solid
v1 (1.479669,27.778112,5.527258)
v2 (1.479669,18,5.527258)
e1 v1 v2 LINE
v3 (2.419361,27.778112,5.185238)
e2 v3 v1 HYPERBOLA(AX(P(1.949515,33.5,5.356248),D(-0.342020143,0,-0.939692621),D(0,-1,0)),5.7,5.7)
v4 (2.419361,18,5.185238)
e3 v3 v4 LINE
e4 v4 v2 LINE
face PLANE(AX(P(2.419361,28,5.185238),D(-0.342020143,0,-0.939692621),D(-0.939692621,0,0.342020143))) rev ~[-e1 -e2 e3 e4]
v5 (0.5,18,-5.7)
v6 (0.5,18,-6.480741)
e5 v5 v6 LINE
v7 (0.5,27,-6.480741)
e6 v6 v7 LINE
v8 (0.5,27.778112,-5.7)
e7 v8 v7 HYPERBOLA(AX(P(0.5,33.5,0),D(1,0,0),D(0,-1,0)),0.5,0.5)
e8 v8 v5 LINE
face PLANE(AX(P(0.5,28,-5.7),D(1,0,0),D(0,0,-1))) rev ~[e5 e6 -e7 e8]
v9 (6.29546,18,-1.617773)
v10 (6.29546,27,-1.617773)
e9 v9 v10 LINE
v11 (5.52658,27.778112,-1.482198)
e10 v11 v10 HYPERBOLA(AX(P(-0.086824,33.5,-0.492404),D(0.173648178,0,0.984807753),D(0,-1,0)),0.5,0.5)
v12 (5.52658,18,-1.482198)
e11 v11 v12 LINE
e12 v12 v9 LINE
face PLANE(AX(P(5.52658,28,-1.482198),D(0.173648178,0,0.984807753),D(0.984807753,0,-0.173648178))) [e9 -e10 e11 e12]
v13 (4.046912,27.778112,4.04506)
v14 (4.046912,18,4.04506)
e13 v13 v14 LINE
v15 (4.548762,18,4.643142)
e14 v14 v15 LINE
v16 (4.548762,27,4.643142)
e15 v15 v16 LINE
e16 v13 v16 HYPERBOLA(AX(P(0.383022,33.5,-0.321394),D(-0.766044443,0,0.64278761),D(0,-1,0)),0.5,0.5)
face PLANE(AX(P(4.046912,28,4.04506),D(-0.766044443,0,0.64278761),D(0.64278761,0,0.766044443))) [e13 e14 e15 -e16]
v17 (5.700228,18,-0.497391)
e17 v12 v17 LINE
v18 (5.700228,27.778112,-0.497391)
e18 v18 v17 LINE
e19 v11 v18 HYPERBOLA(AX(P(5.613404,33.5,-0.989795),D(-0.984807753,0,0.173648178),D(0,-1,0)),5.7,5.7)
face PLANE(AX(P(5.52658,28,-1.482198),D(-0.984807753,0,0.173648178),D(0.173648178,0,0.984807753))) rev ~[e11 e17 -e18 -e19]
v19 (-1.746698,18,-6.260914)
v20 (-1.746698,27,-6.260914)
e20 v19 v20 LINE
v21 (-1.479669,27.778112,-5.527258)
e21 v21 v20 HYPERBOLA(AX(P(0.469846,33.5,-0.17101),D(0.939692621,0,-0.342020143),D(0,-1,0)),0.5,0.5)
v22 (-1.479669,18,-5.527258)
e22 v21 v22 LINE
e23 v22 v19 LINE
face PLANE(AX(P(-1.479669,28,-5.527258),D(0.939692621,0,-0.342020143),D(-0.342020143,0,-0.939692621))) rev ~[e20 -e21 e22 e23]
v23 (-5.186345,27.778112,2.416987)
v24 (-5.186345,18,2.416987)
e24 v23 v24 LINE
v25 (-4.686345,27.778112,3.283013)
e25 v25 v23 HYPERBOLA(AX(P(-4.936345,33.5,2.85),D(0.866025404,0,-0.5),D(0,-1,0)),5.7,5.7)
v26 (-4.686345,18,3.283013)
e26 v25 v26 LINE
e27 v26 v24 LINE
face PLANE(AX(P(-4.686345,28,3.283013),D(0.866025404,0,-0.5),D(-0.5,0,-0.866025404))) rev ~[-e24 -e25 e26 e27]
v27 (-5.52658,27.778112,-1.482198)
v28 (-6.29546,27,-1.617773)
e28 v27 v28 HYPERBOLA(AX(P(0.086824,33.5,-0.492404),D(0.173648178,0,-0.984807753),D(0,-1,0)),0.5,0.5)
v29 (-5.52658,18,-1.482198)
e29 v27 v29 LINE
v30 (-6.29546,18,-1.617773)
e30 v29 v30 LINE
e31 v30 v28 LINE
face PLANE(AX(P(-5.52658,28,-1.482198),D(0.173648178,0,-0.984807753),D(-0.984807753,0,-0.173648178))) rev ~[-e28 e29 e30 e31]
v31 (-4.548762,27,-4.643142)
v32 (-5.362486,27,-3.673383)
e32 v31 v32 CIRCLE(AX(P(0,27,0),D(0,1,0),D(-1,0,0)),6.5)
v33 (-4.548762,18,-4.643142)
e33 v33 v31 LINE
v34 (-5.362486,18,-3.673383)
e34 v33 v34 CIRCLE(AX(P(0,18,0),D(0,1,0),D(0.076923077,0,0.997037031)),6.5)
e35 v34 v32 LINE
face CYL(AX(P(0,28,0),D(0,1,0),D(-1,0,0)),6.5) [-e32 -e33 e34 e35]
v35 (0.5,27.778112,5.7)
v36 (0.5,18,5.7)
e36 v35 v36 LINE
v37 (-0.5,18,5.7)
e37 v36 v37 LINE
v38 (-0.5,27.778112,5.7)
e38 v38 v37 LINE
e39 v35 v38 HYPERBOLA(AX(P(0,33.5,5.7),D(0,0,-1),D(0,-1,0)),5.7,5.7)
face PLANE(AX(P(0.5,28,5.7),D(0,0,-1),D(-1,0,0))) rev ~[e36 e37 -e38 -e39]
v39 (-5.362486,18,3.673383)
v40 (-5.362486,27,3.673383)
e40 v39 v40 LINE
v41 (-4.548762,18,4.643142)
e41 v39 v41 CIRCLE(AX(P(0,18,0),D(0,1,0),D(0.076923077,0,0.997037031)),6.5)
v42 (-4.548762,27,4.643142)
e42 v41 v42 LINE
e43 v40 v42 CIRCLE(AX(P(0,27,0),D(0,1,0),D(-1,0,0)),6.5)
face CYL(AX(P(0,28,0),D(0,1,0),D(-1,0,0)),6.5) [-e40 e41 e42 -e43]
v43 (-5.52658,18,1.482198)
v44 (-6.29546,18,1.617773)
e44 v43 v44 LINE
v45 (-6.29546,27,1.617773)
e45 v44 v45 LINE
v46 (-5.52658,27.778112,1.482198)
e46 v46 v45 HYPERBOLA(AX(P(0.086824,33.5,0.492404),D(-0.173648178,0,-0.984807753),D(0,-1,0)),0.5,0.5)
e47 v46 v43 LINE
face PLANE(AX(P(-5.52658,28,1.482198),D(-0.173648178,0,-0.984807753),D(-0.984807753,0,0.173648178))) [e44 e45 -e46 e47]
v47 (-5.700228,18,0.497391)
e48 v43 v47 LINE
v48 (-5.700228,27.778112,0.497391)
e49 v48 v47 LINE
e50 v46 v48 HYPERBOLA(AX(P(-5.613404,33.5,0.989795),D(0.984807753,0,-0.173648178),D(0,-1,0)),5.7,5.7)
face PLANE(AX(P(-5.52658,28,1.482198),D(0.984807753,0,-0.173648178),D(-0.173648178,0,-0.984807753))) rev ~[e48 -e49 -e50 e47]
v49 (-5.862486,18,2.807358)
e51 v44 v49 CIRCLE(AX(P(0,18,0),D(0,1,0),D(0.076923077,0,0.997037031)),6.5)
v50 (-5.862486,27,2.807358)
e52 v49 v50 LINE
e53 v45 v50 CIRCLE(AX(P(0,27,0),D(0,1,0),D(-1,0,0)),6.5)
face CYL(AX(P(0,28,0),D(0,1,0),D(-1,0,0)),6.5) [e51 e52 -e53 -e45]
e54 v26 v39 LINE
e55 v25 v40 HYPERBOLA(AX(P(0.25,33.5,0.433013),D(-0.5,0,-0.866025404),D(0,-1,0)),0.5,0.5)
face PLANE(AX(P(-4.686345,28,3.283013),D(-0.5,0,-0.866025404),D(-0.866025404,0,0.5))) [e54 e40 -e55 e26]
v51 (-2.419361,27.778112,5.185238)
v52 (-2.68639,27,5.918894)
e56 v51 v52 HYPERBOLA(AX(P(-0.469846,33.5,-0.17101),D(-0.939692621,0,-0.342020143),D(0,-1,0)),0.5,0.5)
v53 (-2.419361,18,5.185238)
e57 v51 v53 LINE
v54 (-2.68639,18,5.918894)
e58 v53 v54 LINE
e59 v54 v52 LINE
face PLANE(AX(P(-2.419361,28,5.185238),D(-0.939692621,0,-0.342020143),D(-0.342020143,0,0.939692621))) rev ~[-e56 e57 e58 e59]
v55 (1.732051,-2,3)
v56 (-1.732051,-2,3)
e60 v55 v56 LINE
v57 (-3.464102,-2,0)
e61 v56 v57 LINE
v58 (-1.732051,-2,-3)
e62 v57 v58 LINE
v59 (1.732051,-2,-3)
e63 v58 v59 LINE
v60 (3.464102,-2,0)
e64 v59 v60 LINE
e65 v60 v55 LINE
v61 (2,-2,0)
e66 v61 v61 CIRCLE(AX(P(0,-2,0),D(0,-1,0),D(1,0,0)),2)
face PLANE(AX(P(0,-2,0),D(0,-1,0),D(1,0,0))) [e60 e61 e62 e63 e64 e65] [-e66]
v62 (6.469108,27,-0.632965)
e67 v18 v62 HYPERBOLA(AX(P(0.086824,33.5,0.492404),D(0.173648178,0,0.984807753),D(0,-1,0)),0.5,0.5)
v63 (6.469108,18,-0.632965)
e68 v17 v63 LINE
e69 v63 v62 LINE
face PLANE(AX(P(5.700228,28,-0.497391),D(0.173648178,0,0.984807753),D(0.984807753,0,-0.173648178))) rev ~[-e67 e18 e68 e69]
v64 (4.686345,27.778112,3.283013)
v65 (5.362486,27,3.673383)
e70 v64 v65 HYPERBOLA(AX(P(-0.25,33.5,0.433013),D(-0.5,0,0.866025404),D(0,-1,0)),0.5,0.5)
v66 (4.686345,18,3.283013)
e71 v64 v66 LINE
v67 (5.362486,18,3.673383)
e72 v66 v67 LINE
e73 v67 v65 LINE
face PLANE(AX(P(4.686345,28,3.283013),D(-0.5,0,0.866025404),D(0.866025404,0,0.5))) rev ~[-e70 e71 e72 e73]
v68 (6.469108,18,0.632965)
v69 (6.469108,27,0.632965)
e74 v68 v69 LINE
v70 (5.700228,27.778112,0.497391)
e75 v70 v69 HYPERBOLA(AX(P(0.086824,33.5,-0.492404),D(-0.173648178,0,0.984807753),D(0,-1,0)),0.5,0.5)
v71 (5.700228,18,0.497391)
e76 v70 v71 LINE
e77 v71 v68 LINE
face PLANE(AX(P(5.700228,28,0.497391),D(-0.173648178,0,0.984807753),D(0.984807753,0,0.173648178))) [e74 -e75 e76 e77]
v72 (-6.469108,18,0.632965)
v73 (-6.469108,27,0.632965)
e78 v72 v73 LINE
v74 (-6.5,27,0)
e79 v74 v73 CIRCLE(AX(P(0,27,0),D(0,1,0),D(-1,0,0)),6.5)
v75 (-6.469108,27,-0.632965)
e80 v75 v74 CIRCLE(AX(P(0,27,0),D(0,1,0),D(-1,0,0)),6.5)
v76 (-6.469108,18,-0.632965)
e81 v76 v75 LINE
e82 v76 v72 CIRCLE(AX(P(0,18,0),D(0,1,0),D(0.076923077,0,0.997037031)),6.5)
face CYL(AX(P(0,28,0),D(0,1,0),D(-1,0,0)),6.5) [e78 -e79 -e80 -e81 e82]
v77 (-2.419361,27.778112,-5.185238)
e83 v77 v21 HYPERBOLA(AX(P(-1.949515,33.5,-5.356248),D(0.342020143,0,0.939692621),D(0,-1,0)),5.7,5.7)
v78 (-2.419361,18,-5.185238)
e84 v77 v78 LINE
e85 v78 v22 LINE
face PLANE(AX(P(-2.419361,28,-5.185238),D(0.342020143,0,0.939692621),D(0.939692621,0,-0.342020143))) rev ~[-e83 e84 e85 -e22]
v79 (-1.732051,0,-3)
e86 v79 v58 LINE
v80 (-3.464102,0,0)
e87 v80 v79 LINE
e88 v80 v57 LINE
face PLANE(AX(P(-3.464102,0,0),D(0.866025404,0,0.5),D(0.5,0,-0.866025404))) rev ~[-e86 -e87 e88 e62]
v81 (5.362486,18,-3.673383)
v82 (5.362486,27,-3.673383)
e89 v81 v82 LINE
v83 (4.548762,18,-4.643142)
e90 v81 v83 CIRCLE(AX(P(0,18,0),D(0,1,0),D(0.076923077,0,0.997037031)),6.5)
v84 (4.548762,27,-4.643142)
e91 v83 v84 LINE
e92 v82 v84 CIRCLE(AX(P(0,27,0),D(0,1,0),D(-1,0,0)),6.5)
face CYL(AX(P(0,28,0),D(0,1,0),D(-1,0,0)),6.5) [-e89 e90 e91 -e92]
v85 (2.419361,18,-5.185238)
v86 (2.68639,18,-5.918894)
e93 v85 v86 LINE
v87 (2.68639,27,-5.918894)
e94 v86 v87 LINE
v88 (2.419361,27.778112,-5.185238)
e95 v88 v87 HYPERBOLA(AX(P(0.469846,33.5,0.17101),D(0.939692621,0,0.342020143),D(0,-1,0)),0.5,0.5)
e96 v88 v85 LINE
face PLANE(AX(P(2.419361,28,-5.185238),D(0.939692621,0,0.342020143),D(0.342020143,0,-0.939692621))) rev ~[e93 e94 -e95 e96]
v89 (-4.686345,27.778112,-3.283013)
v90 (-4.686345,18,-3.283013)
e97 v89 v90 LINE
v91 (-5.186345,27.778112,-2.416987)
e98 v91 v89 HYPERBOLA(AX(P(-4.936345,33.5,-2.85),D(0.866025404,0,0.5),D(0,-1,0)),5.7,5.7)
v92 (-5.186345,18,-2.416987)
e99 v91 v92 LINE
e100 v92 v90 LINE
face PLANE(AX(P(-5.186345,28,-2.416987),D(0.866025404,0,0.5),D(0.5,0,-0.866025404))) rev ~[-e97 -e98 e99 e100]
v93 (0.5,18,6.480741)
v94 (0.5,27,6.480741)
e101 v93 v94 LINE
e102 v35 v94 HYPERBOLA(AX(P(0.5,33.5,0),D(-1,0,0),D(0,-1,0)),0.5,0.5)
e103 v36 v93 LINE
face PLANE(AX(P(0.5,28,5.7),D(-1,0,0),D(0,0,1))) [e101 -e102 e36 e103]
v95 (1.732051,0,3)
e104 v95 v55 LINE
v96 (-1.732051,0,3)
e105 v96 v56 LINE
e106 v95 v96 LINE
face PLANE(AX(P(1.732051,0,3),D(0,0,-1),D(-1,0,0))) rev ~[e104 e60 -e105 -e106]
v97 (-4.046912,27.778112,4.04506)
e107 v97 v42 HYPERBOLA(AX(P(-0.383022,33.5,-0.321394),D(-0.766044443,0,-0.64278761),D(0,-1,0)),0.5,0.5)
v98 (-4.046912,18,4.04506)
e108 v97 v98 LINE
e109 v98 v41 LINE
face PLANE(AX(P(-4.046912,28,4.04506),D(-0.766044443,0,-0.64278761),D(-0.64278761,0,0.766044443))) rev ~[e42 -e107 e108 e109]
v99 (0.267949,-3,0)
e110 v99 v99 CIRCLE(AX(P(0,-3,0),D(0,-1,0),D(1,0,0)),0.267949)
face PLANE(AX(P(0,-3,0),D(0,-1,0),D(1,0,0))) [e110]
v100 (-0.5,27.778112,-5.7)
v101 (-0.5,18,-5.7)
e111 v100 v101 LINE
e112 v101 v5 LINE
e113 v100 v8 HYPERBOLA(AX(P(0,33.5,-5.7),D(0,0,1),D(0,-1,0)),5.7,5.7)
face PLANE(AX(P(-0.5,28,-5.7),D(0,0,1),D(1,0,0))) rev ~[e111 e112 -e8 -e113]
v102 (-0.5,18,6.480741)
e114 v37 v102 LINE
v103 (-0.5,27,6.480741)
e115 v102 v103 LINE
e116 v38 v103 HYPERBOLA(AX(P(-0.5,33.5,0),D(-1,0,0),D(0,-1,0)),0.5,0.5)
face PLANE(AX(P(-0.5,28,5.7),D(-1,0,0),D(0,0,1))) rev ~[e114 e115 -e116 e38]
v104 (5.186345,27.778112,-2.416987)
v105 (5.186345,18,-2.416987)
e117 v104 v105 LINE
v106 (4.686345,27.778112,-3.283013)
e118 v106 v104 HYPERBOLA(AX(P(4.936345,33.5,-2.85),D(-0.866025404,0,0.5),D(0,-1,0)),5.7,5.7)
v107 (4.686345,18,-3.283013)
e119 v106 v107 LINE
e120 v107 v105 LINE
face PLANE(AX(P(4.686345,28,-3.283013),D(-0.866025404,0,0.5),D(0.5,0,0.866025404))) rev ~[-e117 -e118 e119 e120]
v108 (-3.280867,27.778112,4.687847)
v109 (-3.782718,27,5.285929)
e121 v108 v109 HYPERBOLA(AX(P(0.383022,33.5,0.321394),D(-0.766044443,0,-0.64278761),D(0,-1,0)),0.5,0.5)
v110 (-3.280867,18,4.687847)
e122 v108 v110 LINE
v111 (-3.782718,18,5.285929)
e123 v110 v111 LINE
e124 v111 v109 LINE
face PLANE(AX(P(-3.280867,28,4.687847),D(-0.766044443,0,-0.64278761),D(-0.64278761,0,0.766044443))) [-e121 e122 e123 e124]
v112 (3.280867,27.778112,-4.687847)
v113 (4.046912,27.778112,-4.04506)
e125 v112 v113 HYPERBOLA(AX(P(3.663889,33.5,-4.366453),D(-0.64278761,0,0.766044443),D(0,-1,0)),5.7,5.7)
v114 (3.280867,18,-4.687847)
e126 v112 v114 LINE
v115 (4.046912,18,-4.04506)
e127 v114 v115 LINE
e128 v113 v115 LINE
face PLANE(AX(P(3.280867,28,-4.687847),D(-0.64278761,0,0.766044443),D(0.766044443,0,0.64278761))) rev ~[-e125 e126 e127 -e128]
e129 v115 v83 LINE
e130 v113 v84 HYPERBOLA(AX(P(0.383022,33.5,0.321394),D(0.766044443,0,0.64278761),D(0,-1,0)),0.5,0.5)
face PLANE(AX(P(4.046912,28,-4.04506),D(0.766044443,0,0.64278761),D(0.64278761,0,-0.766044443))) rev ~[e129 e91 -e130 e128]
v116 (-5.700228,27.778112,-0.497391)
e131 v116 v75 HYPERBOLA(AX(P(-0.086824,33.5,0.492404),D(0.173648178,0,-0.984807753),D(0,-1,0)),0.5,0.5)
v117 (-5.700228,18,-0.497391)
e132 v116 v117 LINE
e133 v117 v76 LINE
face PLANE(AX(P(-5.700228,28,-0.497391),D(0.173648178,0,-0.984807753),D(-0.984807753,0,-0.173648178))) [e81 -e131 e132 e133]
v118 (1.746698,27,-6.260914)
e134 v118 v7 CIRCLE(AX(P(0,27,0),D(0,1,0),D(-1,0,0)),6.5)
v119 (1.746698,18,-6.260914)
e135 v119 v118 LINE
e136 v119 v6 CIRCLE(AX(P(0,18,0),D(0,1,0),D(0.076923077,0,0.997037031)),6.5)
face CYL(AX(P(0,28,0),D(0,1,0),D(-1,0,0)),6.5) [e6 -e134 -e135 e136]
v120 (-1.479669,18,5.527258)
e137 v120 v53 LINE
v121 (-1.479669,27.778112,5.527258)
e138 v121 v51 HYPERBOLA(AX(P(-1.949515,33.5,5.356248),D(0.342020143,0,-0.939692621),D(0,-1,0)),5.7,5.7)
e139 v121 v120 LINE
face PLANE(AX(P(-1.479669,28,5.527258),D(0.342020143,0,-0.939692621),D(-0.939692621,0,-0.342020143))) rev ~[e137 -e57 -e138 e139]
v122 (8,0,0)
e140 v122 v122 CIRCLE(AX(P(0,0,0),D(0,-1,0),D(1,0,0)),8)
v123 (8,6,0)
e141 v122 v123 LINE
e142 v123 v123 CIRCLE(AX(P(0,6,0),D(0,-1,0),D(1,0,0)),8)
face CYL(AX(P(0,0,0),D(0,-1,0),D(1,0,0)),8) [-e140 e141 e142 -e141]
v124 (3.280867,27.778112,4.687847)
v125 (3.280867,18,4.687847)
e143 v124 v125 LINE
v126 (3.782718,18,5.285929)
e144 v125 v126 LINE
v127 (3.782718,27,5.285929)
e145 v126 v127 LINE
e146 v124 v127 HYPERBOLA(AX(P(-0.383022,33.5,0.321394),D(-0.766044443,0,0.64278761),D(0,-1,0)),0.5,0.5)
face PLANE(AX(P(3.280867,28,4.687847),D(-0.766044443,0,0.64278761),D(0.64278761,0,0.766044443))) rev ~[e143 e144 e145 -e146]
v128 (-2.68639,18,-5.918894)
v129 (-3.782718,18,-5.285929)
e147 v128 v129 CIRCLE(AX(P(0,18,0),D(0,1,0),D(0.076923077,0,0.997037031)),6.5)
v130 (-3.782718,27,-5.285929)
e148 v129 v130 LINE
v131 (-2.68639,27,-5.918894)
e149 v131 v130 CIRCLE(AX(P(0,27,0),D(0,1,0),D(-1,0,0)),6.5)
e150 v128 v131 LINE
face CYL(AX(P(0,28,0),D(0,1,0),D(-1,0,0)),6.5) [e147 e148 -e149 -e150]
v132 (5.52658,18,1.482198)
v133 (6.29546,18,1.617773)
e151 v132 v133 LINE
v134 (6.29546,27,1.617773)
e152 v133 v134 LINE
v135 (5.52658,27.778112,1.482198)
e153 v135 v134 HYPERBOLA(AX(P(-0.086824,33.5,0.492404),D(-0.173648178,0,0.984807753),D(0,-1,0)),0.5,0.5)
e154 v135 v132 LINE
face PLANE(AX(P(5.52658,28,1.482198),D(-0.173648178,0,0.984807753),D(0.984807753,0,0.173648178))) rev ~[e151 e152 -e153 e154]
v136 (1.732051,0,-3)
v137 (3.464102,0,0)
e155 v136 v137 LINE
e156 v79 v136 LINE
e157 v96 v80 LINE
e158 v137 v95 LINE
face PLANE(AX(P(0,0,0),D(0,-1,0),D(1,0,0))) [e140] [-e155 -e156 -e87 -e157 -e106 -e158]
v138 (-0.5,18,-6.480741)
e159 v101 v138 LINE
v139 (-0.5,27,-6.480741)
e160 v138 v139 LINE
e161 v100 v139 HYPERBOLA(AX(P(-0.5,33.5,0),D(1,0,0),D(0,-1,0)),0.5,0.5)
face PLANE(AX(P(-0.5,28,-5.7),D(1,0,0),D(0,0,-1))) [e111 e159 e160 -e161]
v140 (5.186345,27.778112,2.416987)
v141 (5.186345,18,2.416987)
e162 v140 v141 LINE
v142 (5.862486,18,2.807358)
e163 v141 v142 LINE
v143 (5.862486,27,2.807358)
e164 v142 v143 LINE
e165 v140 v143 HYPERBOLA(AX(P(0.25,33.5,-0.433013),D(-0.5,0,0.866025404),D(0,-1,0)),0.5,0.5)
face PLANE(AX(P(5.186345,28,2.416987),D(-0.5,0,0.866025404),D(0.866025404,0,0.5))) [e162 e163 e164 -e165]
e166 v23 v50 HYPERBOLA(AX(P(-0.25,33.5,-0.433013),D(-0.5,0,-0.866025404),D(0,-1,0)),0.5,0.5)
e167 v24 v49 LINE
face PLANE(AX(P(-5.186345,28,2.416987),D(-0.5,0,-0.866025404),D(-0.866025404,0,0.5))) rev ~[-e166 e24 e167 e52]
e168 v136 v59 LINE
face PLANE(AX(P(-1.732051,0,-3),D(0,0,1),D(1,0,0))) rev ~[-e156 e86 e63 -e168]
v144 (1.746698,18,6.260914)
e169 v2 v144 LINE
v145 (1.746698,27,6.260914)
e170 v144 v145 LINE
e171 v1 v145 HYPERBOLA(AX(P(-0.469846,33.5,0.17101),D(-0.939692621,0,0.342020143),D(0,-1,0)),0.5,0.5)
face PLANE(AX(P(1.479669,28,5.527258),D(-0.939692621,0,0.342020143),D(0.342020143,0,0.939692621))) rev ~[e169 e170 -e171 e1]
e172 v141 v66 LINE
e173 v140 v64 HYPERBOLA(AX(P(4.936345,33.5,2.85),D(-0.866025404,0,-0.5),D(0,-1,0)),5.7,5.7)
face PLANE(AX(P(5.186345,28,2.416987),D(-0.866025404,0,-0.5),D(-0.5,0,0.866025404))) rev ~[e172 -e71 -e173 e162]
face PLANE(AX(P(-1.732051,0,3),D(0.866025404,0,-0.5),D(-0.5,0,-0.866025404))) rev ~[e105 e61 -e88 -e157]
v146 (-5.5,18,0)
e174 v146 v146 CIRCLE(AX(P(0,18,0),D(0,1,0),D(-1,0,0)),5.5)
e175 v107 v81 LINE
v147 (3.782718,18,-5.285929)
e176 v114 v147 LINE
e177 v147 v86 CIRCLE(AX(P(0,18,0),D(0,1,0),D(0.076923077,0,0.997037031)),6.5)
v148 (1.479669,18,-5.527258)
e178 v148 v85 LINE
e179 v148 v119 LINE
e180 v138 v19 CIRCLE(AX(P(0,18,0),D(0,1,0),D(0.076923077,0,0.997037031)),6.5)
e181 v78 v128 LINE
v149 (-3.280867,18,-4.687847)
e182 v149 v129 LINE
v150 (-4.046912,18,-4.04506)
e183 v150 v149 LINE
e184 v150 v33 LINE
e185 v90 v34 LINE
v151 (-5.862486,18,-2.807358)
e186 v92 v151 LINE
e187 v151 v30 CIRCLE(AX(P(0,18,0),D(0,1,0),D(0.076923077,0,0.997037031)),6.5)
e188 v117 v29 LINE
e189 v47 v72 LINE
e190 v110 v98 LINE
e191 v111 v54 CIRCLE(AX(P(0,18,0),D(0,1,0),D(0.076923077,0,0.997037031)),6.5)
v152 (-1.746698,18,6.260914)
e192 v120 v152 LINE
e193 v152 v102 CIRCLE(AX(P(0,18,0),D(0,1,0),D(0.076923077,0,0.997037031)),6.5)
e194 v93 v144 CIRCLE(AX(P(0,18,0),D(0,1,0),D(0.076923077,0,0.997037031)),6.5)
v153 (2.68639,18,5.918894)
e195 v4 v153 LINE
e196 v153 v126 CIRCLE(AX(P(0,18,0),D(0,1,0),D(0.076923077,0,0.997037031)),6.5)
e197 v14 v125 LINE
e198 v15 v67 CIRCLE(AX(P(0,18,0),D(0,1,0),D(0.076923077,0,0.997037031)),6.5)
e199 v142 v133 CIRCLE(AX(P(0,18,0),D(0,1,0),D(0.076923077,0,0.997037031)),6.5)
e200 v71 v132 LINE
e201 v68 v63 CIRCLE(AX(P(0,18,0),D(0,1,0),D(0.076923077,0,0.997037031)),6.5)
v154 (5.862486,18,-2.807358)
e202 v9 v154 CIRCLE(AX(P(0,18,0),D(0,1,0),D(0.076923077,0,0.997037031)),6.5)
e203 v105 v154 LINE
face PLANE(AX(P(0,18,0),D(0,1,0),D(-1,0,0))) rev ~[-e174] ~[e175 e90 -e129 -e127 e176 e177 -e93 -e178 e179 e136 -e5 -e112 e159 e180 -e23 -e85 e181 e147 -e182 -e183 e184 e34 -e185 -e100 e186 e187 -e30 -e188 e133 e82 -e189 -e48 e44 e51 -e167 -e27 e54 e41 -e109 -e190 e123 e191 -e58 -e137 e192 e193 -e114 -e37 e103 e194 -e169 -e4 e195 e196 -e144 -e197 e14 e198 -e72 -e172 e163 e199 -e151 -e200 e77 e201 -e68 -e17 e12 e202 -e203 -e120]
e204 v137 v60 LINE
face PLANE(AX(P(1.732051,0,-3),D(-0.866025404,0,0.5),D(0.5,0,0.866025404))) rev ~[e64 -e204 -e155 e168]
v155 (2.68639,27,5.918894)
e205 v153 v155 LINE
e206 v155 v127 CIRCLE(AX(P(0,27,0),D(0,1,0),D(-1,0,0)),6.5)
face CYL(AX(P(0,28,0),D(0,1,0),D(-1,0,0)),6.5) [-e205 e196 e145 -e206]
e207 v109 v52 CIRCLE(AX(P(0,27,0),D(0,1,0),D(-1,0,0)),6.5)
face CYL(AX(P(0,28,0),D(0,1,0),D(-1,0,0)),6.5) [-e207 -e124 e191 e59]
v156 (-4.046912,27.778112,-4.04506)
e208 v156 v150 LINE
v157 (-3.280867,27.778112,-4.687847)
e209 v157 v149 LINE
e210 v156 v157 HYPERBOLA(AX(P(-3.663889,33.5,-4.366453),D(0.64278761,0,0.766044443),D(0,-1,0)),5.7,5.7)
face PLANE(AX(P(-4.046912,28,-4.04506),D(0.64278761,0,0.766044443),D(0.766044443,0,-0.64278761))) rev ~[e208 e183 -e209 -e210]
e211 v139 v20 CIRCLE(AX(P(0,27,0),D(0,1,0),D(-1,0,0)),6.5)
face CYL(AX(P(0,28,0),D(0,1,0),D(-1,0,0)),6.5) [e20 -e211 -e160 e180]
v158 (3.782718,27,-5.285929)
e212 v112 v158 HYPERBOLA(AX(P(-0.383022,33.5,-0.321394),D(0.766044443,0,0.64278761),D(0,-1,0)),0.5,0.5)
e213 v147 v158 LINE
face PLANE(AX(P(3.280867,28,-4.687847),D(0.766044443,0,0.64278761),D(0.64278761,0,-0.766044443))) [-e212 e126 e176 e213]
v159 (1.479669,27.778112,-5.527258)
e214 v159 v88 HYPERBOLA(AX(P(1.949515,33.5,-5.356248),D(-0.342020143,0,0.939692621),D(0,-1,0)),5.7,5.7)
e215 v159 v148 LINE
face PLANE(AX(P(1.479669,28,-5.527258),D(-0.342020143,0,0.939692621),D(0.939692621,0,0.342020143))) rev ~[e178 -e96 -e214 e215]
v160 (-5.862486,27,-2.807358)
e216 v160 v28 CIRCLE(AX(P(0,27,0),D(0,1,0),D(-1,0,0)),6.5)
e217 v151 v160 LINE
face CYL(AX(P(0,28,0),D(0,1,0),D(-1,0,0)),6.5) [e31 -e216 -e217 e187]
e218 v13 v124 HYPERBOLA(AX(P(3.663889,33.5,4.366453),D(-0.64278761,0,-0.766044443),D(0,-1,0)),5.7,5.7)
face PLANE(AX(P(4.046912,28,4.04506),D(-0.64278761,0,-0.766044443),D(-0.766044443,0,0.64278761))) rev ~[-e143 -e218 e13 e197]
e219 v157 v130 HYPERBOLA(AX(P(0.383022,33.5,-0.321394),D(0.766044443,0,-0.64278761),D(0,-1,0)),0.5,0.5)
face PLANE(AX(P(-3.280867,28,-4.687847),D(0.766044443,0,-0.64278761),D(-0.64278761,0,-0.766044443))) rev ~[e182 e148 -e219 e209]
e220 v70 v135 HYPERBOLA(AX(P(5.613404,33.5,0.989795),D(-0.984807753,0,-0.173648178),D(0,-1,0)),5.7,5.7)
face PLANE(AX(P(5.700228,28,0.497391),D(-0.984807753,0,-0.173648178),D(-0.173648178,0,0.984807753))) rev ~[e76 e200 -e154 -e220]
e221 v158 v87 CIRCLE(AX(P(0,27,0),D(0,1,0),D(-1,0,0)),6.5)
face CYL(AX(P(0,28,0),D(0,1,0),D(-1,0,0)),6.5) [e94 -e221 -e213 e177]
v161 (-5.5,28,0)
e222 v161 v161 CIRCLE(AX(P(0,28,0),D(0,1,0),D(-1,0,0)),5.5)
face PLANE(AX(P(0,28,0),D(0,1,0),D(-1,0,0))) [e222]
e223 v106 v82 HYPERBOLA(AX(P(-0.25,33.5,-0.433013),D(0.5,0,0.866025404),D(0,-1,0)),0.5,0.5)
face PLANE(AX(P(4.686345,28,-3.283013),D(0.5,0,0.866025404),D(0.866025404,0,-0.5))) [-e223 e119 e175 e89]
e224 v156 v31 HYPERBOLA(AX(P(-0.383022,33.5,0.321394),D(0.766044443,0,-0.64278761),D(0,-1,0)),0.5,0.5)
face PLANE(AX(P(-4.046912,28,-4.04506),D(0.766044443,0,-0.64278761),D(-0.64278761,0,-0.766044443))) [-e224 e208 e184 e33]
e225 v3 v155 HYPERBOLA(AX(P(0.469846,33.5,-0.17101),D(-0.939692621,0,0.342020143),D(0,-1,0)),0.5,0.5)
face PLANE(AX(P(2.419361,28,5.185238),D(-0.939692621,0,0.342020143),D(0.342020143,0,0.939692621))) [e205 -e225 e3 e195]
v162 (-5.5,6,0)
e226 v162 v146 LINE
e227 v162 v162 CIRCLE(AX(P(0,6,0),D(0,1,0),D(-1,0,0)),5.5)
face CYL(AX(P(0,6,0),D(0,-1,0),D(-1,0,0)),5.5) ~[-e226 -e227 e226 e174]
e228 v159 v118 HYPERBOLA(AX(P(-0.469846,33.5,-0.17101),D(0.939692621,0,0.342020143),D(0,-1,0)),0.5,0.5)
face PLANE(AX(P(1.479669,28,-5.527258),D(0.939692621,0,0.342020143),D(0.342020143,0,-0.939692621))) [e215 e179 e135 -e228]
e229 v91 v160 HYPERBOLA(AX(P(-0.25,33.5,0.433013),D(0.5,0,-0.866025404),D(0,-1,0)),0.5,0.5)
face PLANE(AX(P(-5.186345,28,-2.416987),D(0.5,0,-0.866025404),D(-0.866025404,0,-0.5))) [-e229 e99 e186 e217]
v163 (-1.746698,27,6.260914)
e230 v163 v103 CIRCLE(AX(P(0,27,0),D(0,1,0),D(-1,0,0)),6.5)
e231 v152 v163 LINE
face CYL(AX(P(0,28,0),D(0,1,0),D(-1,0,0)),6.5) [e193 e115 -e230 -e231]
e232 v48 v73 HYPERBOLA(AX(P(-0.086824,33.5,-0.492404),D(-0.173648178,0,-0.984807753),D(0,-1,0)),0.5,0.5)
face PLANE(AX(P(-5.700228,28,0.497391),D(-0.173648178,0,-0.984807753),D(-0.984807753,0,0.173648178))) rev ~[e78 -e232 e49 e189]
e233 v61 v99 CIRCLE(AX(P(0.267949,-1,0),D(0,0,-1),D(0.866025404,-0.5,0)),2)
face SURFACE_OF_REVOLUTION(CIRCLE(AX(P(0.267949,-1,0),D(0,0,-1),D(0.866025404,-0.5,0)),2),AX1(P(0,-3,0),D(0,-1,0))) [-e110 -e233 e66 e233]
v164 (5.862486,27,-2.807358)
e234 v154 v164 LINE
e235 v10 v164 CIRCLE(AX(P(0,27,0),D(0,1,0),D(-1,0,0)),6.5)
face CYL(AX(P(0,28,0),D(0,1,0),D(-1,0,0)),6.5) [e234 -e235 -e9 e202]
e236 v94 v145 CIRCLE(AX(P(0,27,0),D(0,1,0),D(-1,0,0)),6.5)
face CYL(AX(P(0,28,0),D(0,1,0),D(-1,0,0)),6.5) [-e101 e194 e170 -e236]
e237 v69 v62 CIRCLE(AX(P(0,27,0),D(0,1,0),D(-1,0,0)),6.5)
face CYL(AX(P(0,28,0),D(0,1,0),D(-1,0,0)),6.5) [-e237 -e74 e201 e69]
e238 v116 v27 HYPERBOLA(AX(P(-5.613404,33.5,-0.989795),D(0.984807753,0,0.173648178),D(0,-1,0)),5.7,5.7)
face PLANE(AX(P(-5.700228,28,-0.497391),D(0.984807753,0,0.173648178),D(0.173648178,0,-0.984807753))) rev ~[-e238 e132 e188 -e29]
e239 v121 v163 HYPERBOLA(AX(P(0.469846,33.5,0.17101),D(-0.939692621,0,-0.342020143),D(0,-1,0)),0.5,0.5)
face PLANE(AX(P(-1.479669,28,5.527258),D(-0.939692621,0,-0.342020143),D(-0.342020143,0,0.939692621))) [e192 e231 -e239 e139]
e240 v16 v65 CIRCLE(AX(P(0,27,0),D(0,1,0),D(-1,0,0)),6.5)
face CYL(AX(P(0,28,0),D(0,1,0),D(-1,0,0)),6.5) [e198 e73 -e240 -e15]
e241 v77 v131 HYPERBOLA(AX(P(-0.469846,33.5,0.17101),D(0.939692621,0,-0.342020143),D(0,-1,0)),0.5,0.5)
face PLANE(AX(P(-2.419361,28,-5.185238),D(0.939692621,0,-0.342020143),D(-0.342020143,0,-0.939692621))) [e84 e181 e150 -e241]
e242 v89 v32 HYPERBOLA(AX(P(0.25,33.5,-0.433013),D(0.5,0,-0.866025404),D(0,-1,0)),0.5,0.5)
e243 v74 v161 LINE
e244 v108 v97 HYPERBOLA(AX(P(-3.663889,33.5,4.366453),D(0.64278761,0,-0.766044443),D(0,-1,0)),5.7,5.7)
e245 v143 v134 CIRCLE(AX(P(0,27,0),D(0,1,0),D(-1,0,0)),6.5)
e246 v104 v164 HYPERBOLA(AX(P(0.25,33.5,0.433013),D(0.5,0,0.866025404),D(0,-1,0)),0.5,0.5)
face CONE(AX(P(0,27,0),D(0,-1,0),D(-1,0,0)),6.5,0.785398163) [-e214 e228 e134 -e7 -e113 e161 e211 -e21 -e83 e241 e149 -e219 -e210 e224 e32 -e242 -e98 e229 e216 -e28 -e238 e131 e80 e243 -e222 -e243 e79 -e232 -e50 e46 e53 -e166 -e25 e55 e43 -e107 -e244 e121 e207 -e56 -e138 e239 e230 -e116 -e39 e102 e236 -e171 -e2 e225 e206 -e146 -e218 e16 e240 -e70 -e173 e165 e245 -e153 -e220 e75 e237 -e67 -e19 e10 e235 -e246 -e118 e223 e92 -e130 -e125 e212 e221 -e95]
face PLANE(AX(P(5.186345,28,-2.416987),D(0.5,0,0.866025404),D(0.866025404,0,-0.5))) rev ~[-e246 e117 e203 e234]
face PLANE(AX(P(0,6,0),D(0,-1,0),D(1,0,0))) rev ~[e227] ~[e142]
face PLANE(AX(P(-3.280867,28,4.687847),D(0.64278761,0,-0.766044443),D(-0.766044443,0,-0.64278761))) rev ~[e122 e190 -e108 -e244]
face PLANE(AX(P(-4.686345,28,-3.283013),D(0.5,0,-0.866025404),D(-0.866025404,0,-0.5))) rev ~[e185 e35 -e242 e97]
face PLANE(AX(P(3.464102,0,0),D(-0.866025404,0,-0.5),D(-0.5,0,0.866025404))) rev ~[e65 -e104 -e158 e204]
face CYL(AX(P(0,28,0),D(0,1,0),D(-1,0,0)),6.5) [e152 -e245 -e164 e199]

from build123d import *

# Parameters (mm, degrees)
F0_R             = 8
F1_DEPTH         = 6
F3_DEPTH         = 2
F4_R             = 2
F5_DEPTH         = 1
F7_R             = 5.5
F8_DEPTH         = 22
F9_R             = 6.5
F9_R_2           = 5.5
F10_DEPTH        = 10
F11_SIZE         = 1
F12_W            = 1
F12_H            = 2
F13_DEPTH        = 20
F13_COPIES_COUNT = 18


# Not quite as in the source:
# - a fillet or chamfer that OpenCascade refuses, or shapes differently, is made with other operations: its cross-section is extruded or revolved along the edge and cut away or added
# - a pattern or mirror of a feature is missing from the dataset's text; its kind, count and spacing are read off the source's solid


with BuildPart() as f1:
    # F0 (on Front) → F1 (new body)
    with BuildSketch(Plane.XZ):
        Circle(F0_R)
    extrude(amount=-F1_DEPTH)

    # F2 (on face) → F3 (join)
    with BuildSketch(Plane.XZ):
        Polygon((-1.7320508076, 3), (-3.4641016151, 0), (-1.7320508076, -3), (1.7320508076, -3), (3.4641016151, 0), (1.7320508076, 3), align=None)
    extrude(amount=F3_DEPTH)

    # F4 (on face) → F5 (join)
    with BuildSketch(Plane.XZ.offset(2)):
        Circle(F4_R)
    extrude(amount=F5_DEPTH)

    # F6: fillet of radius 2 on 1 edges, made by hand

    # F6_s1 → F6_t2 (revolve, cut)
    with BuildSketch(Plane.XY):
        with BuildLine():
            ThreePointArc((2, -2), (1.2679491924, -2.7320508076), (0.2679491924, -3))
            Line((0.2679491924, -3), (2, -3))
            Line((2, -3), (2, -2))
        make_face()
    revolve(axis=Axis((0, -3, 0), (0, -1, 0)), mode=Mode.SUBTRACT)

    # F7 (on face) → F8 (join)
    with BuildSketch(Plane(origin=(0, 6, 0), x_dir=(-1, 0, 0), z_dir=(0, 1, 0))):
        Circle(F7_R)
    extrude(amount=F8_DEPTH)

    # F9 (on face) → F10 (join)
    with BuildSketch(Plane(origin=(0, 28, 0), x_dir=(-1, 0, 0), z_dir=(0, 1, 0))):
        Circle(F9_R)
        Circle(F9_R_2, mode=Mode.SUBTRACT)
    extrude(amount=-F10_DEPTH)

    # F11
    f11_edges = [f1.edges().sort_by_distance(p)[0] for p in [
        (6.5, 28, 0),
    ]]
    chamfer(f11_edges, length=F11_SIZE)

    # F12 (on face) → F13 (cut)
    with BuildSketch(Plane(origin=(0, 28, 0), x_dir=(-1, 0, 0), z_dir=(0, 1, 0))):
        with Locations((0, 6.7)):
            Rectangle(F12_W, F12_H)
    f13 = extrude(amount=-F13_DEPTH, mode=Mode.SUBTRACT)

    # F13_copies: F13 ×18 about axis
    f13_copies_axis = Axis((0, 0, 0), (0, 1, 0))
    for i in range(1, F13_COPIES_COUNT):
        add(f13.rotate(f13_copies_axis, i * 360 / F13_COPIES_COUNT), mode=Mode.SUBTRACT)


solid = f1.part
